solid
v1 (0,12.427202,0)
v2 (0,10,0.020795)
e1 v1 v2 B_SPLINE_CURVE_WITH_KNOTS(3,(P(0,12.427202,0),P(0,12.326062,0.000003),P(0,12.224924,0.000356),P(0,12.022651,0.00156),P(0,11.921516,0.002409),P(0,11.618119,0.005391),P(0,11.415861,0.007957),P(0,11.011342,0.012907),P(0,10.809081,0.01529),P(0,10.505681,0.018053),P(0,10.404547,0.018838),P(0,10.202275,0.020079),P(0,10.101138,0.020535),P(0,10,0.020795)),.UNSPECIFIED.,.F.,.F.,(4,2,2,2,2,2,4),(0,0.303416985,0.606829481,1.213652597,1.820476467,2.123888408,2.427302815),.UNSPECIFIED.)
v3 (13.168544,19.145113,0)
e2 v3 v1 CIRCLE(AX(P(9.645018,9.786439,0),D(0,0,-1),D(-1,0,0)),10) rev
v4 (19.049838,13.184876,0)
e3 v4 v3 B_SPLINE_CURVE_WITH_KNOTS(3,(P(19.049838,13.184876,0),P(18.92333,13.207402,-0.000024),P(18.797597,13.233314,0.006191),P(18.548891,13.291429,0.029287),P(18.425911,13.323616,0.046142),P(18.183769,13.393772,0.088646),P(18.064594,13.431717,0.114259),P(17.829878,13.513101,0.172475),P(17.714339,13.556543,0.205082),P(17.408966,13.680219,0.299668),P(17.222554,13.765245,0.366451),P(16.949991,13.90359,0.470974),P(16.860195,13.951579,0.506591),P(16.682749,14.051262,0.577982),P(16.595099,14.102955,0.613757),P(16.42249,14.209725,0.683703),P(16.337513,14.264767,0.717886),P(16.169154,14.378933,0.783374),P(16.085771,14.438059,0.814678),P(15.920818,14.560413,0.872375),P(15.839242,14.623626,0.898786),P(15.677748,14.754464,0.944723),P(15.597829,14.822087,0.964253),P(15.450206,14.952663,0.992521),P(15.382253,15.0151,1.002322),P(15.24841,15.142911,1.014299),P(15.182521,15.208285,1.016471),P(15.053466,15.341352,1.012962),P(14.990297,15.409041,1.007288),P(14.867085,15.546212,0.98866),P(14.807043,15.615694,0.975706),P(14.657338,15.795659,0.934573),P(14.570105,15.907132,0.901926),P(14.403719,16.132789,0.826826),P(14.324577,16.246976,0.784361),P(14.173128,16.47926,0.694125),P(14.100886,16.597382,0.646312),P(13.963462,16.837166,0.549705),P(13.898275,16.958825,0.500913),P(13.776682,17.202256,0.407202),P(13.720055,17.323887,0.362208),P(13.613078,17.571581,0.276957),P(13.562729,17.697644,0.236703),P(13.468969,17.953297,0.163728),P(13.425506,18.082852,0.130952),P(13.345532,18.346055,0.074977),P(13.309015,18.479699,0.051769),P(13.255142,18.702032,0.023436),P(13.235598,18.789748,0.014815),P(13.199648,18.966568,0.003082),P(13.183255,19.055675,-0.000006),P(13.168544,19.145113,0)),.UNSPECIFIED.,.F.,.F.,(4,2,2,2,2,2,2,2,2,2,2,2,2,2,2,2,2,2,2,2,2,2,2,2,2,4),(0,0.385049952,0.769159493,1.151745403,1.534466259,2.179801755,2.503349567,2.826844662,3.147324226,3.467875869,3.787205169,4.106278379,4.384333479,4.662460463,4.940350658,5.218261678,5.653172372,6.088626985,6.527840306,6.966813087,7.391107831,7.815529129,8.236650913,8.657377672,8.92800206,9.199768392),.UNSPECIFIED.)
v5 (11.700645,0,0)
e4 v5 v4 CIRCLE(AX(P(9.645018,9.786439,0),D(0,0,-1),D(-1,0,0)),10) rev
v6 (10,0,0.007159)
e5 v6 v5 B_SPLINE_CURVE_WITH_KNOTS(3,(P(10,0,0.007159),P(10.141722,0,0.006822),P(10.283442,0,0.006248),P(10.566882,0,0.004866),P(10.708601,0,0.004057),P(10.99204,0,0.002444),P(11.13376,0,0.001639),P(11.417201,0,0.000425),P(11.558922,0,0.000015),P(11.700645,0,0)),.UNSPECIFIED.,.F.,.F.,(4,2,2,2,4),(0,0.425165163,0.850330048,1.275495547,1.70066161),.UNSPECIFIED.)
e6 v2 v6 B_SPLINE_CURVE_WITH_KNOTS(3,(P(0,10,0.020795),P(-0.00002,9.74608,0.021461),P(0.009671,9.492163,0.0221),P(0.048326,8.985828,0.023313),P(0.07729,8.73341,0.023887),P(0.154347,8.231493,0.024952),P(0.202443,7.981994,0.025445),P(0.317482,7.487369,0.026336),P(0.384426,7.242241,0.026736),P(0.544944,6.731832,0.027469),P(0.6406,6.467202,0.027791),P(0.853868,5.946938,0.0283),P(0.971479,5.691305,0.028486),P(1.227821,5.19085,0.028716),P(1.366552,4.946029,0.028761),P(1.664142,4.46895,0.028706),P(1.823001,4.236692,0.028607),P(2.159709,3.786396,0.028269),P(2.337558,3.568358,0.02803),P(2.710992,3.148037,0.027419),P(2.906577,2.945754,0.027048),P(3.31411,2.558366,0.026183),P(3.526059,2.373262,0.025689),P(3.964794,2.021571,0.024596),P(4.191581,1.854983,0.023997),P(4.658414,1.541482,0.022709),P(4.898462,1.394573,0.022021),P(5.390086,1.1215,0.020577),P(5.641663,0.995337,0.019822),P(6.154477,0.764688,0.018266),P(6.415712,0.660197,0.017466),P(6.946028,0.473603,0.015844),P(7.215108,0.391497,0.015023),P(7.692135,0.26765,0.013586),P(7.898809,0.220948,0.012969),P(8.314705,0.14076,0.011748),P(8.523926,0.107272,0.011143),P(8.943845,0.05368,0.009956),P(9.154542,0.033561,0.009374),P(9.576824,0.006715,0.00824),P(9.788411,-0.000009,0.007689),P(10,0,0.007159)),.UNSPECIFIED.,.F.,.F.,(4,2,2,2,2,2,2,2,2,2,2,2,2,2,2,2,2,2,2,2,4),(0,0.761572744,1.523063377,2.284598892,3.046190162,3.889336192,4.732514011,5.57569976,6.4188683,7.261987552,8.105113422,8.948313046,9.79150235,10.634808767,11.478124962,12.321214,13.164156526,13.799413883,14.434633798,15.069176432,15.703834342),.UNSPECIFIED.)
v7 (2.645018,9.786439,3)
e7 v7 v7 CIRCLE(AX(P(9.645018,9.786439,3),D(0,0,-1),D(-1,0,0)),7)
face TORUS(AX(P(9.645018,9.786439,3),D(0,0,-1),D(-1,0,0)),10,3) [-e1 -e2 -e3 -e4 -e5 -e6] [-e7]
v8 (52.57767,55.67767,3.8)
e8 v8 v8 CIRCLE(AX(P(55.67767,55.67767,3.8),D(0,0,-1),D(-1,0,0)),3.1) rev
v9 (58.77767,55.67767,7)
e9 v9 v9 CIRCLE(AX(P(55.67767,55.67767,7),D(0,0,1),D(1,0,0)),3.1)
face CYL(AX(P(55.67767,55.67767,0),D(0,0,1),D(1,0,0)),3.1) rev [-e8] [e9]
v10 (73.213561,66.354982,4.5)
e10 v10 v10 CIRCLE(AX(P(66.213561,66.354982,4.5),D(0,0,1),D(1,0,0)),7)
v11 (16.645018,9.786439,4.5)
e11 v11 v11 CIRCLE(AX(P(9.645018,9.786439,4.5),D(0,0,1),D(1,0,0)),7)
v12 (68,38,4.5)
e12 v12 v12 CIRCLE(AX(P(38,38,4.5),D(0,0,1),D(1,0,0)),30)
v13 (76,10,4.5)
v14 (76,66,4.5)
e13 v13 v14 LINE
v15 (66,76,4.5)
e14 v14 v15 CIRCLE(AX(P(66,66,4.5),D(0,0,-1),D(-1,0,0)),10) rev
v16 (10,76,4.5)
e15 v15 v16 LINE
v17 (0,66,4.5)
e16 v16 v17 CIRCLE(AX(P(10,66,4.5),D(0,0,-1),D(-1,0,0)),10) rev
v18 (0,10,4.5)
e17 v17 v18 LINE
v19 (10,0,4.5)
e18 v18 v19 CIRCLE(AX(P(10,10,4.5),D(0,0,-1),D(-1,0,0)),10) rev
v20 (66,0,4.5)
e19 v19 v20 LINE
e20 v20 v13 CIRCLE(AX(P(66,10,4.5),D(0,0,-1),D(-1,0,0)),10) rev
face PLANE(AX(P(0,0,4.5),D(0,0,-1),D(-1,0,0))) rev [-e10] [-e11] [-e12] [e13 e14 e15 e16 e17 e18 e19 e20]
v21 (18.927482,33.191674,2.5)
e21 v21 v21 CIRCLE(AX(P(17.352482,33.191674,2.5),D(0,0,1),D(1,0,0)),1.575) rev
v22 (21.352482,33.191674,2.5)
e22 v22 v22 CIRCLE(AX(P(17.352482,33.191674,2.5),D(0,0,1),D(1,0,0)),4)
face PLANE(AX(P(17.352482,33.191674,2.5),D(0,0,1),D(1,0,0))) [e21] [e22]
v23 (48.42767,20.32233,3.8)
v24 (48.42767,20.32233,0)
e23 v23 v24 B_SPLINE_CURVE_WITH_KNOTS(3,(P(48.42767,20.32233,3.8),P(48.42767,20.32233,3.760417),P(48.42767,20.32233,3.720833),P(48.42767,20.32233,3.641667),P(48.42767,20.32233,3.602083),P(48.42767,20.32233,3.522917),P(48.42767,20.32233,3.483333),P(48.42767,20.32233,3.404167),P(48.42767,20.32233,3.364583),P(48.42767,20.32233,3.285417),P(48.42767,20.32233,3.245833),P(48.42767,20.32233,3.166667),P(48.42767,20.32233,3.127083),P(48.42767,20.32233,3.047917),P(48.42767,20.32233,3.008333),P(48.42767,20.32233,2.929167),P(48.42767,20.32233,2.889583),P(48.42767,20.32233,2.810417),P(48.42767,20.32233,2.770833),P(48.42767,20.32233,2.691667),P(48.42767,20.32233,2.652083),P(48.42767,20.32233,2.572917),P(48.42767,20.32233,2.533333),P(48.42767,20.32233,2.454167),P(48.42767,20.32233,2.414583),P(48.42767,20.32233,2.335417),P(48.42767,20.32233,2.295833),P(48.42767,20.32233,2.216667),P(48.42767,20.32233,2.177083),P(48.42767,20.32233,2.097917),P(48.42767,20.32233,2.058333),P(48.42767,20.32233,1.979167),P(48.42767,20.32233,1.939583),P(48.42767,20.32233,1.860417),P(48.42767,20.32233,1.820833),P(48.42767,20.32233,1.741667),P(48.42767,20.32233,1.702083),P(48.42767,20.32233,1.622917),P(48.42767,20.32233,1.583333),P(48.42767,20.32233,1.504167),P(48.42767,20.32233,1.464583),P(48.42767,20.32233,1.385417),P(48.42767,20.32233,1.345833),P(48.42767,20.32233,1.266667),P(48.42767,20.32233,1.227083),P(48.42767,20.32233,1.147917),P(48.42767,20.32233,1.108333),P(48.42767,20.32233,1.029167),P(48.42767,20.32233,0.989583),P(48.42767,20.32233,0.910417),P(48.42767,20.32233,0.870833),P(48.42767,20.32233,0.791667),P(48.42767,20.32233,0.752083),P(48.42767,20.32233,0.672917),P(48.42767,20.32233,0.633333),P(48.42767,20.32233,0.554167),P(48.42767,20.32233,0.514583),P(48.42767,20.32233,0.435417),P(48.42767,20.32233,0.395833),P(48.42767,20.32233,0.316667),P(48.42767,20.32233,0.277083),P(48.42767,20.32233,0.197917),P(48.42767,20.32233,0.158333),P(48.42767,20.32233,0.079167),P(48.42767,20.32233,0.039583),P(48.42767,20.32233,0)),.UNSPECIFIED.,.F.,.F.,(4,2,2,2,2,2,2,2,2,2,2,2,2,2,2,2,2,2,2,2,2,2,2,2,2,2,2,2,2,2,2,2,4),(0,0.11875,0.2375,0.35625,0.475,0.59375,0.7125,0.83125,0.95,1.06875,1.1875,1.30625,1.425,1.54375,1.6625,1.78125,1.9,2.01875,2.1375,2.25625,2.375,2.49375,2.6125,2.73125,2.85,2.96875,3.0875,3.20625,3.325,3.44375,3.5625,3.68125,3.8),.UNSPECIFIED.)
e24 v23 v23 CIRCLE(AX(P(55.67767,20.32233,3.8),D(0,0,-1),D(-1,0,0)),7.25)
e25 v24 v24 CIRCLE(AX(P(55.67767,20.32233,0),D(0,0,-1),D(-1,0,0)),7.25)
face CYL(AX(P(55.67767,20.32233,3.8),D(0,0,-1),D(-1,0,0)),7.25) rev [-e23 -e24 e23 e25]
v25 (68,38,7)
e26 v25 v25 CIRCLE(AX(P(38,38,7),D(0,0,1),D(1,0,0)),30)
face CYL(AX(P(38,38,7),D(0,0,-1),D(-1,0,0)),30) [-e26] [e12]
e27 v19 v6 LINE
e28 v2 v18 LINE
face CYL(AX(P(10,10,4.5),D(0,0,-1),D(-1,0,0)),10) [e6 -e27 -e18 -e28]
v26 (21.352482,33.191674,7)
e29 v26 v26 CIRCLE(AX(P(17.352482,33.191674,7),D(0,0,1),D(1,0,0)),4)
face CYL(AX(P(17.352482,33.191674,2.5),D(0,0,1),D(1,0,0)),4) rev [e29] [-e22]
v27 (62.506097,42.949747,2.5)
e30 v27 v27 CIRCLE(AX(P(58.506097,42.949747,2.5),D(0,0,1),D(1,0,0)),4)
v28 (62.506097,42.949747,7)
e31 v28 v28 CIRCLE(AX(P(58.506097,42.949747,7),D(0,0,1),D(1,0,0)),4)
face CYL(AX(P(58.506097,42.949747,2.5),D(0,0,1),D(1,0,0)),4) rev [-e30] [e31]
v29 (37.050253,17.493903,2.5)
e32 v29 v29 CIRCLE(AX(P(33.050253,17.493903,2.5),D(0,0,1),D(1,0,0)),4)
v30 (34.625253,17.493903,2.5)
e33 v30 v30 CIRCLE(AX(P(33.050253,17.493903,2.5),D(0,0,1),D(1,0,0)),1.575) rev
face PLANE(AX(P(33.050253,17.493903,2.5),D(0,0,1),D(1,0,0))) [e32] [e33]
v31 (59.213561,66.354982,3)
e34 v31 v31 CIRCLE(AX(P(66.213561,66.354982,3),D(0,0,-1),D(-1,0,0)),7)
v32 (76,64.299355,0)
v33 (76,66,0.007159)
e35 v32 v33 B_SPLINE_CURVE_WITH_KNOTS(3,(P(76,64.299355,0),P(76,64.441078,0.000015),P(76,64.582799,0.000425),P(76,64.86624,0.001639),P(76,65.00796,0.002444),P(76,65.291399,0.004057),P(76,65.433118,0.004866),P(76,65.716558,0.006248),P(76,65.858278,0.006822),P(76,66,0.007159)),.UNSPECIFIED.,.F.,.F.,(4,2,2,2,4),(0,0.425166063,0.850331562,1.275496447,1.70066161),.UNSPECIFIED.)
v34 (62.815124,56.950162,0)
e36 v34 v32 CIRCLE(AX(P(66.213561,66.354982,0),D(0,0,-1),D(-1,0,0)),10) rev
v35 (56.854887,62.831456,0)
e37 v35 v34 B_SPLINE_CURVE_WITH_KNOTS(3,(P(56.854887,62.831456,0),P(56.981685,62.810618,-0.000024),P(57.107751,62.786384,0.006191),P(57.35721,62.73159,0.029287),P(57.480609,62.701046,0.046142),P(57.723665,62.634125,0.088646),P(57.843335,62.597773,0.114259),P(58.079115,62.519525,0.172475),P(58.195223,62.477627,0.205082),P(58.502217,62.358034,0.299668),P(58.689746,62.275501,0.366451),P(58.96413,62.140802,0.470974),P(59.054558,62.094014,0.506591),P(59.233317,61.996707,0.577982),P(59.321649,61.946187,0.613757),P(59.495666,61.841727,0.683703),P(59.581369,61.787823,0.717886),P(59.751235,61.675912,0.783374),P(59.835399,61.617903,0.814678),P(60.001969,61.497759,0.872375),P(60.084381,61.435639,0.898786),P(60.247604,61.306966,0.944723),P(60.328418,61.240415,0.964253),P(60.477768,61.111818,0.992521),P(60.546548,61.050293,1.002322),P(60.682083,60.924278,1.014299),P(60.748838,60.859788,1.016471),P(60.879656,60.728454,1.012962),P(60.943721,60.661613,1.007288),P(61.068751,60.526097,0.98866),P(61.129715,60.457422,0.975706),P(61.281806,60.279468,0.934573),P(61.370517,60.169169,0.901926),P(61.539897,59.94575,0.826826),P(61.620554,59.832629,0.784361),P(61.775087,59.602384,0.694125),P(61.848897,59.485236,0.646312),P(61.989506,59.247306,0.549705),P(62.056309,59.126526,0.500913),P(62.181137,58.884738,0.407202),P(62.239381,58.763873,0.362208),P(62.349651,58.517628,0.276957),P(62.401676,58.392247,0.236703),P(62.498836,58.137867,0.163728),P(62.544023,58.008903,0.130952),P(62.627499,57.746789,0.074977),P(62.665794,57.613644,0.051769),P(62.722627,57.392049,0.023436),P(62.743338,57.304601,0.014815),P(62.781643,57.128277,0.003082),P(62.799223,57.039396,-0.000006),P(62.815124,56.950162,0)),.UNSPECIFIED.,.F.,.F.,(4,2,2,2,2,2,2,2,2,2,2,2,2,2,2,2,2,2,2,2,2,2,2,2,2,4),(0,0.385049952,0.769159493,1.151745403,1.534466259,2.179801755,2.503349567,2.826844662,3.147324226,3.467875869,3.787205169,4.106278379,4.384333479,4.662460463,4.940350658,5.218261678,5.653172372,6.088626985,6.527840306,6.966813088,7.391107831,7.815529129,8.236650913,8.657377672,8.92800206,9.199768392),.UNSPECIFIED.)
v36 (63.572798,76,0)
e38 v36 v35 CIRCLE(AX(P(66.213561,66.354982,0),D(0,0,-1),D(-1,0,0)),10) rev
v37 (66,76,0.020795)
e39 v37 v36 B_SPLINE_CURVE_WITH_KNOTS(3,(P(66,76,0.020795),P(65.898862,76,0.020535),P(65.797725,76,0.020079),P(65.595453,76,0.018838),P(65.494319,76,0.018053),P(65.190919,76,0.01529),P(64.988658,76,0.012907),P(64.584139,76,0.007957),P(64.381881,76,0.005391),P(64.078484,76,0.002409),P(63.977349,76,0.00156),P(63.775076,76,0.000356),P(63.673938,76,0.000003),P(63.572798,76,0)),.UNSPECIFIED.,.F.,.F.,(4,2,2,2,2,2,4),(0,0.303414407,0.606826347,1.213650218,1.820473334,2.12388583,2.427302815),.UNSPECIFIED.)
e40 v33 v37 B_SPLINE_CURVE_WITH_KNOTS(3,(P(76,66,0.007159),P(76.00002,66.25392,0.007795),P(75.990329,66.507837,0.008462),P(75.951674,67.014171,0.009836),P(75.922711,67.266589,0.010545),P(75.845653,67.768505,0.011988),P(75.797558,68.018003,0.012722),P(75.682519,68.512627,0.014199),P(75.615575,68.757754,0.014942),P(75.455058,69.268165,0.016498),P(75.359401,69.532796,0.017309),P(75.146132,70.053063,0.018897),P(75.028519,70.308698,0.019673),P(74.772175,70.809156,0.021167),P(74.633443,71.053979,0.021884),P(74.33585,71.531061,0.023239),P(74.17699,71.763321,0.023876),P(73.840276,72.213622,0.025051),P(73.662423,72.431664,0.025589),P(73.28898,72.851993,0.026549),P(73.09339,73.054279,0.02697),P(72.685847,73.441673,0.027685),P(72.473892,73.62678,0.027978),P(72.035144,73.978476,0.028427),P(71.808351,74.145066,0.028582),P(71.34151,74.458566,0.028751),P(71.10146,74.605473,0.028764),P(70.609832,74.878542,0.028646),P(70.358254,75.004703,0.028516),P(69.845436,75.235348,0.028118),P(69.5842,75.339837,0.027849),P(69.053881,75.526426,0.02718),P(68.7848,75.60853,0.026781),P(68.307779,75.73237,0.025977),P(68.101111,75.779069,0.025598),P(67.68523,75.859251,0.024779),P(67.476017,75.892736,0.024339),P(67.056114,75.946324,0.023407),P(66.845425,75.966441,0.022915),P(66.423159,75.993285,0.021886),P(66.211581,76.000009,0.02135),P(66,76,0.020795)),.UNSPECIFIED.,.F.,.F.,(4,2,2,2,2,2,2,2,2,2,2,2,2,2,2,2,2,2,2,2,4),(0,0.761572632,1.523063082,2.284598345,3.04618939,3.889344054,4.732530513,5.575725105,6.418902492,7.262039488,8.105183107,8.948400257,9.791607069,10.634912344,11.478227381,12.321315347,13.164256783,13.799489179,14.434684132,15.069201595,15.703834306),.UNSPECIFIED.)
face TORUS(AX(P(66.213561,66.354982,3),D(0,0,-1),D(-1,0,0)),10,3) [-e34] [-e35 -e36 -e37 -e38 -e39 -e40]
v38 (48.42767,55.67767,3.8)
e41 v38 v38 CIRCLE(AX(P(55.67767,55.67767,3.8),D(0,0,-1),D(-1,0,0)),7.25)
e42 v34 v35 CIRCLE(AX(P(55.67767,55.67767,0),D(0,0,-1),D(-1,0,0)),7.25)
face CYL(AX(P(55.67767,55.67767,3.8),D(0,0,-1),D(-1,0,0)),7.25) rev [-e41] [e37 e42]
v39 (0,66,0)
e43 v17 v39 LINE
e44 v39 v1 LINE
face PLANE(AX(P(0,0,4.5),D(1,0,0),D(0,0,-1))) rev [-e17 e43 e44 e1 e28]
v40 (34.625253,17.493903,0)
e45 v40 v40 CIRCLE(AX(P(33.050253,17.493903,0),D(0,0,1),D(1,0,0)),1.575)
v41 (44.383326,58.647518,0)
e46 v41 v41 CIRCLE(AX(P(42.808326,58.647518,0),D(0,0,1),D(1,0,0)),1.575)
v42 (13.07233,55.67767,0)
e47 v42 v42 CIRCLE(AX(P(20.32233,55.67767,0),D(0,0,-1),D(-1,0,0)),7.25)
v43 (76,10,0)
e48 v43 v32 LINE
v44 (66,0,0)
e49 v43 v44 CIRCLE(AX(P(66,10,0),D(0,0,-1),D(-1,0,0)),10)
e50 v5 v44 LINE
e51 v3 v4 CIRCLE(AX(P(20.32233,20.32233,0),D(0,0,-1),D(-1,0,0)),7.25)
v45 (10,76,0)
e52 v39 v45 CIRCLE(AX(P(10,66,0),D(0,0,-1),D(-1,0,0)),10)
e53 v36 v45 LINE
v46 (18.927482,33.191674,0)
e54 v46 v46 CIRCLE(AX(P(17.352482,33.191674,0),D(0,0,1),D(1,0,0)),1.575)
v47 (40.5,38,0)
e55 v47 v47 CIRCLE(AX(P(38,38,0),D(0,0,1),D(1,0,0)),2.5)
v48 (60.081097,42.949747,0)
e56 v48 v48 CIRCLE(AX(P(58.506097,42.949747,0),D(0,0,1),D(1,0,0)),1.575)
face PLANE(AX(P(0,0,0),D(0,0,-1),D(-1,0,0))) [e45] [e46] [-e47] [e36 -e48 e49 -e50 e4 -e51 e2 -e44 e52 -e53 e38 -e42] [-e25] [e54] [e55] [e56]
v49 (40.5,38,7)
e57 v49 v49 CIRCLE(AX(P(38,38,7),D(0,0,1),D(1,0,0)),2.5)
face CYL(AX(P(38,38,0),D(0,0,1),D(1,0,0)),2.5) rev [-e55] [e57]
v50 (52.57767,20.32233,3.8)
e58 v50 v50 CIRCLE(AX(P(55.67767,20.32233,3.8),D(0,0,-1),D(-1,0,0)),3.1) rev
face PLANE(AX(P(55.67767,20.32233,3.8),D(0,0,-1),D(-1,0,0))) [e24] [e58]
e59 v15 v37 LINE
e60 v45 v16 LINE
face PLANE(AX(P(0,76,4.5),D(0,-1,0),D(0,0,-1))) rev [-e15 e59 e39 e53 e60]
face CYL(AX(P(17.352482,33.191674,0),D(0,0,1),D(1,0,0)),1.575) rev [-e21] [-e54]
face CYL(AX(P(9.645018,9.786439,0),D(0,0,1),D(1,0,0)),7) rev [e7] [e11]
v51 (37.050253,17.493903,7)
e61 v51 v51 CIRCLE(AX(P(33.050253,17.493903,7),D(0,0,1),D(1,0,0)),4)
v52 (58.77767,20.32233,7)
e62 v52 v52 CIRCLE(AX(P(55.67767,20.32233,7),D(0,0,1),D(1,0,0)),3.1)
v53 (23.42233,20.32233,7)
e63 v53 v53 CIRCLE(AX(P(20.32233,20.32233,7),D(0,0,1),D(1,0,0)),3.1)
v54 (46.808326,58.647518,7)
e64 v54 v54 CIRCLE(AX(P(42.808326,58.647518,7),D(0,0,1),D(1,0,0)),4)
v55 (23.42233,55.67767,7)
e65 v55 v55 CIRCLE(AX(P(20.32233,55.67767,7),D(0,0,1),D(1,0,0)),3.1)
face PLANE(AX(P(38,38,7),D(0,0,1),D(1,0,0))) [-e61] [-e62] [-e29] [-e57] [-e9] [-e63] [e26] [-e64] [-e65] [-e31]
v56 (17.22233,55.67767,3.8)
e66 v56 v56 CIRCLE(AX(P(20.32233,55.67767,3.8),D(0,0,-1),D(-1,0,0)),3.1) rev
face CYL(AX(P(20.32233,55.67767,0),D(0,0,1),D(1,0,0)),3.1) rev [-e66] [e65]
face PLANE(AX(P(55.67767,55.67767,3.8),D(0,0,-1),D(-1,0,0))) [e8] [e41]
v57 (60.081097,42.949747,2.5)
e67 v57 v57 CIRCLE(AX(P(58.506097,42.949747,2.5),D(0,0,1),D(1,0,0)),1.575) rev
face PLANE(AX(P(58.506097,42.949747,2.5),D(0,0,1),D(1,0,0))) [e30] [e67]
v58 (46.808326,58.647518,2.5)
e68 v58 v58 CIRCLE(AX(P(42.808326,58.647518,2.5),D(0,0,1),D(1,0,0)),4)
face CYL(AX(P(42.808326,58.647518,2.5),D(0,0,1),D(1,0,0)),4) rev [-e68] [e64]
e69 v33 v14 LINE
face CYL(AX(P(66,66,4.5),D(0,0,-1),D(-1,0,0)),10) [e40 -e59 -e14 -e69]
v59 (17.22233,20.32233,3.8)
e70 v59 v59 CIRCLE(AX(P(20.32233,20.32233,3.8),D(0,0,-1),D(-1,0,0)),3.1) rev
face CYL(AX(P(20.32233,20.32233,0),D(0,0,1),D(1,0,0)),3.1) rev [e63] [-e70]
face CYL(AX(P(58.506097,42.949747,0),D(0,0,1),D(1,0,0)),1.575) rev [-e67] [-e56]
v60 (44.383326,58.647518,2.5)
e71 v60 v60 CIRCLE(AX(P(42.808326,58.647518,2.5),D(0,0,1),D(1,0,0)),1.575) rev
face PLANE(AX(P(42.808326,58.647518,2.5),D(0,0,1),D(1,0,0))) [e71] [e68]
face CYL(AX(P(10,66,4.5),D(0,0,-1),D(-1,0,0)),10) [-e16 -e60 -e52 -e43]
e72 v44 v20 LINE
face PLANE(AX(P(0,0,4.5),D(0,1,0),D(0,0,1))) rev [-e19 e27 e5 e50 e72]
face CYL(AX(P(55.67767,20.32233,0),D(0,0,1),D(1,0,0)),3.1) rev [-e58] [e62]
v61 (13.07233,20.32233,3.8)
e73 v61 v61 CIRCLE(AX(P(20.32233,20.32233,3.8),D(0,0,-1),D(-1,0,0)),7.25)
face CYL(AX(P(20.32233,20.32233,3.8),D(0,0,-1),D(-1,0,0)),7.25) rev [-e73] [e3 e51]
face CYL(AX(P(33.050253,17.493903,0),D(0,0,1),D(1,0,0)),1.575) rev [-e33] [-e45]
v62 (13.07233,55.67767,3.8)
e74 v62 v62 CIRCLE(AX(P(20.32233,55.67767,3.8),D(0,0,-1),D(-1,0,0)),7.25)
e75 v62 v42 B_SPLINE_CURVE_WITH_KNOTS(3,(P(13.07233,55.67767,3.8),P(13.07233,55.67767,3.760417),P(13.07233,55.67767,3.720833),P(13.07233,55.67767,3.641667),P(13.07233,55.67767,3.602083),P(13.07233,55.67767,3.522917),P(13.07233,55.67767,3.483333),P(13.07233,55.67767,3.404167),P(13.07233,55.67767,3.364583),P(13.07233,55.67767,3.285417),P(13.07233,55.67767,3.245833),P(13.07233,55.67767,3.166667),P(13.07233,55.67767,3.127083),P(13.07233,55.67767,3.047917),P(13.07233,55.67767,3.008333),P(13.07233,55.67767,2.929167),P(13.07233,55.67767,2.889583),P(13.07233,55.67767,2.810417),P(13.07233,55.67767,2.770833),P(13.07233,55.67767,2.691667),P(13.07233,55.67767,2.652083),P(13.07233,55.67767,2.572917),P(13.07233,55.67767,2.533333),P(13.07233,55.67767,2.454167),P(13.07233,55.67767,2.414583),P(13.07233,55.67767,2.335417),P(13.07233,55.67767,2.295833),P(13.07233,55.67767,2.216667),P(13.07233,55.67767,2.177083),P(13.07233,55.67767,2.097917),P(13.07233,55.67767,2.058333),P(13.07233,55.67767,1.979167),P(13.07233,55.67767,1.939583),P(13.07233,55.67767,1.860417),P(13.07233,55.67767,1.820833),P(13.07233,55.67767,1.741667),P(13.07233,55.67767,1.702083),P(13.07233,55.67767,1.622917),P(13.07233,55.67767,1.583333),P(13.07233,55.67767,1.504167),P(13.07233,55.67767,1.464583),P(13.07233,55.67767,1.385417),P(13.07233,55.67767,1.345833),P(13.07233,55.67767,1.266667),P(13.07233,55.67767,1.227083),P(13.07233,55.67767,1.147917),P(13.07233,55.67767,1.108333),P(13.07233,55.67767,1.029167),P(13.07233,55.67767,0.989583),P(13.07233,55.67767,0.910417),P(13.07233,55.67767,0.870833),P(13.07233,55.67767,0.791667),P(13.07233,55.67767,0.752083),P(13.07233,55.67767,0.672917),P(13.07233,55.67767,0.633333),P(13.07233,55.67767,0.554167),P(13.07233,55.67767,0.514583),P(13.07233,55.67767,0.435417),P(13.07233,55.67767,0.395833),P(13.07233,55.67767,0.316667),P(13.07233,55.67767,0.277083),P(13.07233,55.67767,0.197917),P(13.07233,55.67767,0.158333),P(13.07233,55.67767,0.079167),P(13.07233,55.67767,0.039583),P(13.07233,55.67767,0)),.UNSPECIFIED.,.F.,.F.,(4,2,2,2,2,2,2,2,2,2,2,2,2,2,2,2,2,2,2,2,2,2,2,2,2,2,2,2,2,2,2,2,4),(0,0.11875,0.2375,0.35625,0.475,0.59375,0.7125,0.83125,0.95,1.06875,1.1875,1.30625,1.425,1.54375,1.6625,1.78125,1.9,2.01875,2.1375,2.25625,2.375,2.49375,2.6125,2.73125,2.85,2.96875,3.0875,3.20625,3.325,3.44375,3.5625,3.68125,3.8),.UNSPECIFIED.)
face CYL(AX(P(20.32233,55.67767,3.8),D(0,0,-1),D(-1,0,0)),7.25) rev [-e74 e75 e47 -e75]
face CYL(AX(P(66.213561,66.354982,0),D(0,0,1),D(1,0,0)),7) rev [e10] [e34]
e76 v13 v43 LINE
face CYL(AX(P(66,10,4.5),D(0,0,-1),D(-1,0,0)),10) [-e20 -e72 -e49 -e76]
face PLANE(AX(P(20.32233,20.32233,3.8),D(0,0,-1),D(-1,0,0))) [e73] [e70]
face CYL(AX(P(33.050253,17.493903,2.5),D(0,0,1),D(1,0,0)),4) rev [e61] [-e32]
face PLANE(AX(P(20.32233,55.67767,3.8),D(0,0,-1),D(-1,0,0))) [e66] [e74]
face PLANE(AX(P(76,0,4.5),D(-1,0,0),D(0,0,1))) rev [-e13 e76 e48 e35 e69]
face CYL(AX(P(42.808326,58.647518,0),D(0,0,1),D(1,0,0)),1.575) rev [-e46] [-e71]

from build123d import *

# Parameters (mm, degrees)
SKETCH1_W           = 76
SKETCH1_H           = 76
BOSS_EXTRUDE1_DEPTH = 4.5
SKETCH2_R           = 3.1
SKETCH2_R_2         = 2.5
SKETCH2_R_3         = 7
SKETCH2_R_4         = 1.575
CUT_EXTRUDE1_DEPTH  = 108.574392864
FILLET1_R           = 10
SKETCH3_R           = 7.25
CUT_EXTRUDE2_DEPTH  = 3.8
SKETCH4_R           = 4
CUT_EXTRUDE3_DEPTH  = 2
FILLET2_R           = 3
BOSS_EXTRUDE2_START = 2.5
SKETCH6_R           = 30
SKETCH6_R_2         = 2.5
SKETCH6_R_3         = 3.1
SKETCH6_R_4         = 4
BOSS_EXTRUDE2_DEPTH = 2.5


with BuildPart() as part:
    # Sketch1 → Boss-Extrude1 (new body)
    with BuildSketch(Plane.XY):
        with Locations((38, 38)):
            Rectangle(SKETCH1_W, SKETCH1_H)
    extrude(amount=BOSS_EXTRUDE1_DEPTH)

    # Sketch2 → Cut-Extrude1 (cut, through all)
    with BuildSketch(Plane.XY.offset(4.5)):
        with Locations((55.67766953, 55.67766953)):
            Circle(SKETCH2_R)
        with Locations((20.32233047, 55.67766953)):
            Circle(SKETCH2_R)
        with Locations((20.32233047, 20.32233047)):
            Circle(SKETCH2_R)
        with Locations((55.67766953, 20.32233047)):
            Circle(SKETCH2_R)
        with Locations((38, 38)):
            Circle(SKETCH2_R_2)
        with Locations((66.213560569, 66.354981926)):
            Circle(SKETCH2_R_3)
        with Locations((42.808326112, 58.647518011)):
            Circle(SKETCH2_R_4)
        with Locations((58.506096654, 42.949747468)):
            Circle(SKETCH2_R_4)
        with Locations((17.352481989, 33.191673888)):
            Circle(SKETCH2_R_4)
        with Locations((9.645018074, 9.786439431)):
            Circle(SKETCH2_R_3)
        with Locations((33.050252532, 17.493903346)):
            Circle(SKETCH2_R_4)
    extrude(amount=-CUT_EXTRUDE1_DEPTH, mode=Mode.SUBTRACT)

    # Fillet1
    fillet1_edges = [part.edges().sort_by_distance(p)[0] for p in [
        (0, 76, 2.25),
        (76, 76, 2.25),
        (76, 0, 2.25),
        (0, 0, 2.25),
    ]]
    fillet(fillet1_edges, radius=FILLET1_R)

    # Sketch3 → Cut-Extrude2 (cut)
    with BuildSketch(Plane(origin=(0, 0, 0), x_dir=(-1, 0, 0), z_dir=(0, 0, -1))):
        with Locations((-55.67766953, 55.67766953)):
            Circle(SKETCH3_R)
        with Locations((-20.32233047, 55.67766953)):
            Circle(SKETCH3_R)
        with Locations((-55.67766953, 20.32233047)):
            Circle(SKETCH3_R)
        with Locations((-20.32233047, 20.32233047)):
            Circle(SKETCH3_R)
    extrude(amount=-CUT_EXTRUDE2_DEPTH, mode=Mode.SUBTRACT)

    # Sketch4 → Cut-Extrude3 (cut)
    with BuildSketch(Plane.XY.offset(4.5)):
        with Locations((58.506096654, 42.949747468)):
            Circle(SKETCH4_R)
        with Locations((33.050252532, 17.493903346)):
            Circle(SKETCH4_R)
        with Locations((17.352481989, 33.191673888)):
            Circle(SKETCH4_R)
        with Locations((42.808326112, 58.647518011)):
            Circle(SKETCH4_R)
    extrude(amount=-CUT_EXTRUDE3_DEPTH, mode=Mode.SUBTRACT)

    # Fillet2
    # the kernel refuses this fillet: 3 mm, written as the material it takes off along each edge
    with BuildSketch(Plane(origin=(66.213560569, 66.354981926, 0), x_dir=(1, 0, 0), z_dir=(0, -1, 0))) as fillet2_piece_1:
        with BuildLine():
            CenterArc((7 + FILLET2_R, FILLET2_R), FILLET2_R, 180, 90)
            Line((7, FILLET2_R), (7, 0))
            Line((7, 0), (7 + FILLET2_R, 0))
        make_face()
    revolve(axis=Axis((66.213560569, 66.354981926, 0), (0, 0, 1)), mode=Mode.SUBTRACT)
    with BuildSketch(Plane(origin=(9.645018074, 9.786439431, 0), x_dir=(1, 0, 0), z_dir=(0, -1, 0))) as fillet2_piece_2:
        with BuildLine():
            CenterArc((7 + FILLET2_R, FILLET2_R), FILLET2_R, 180, 90)
            Line((7, FILLET2_R), (7, 0))
            Line((7, 0), (7 + FILLET2_R, 0))
        make_face()
    revolve(axis=Axis((9.645018074, 9.786439431, 0), (0, 0, 1)), mode=Mode.SUBTRACT)

    # Sketch6 → Boss-Extrude2 (add)
    with BuildSketch(Plane.XY.offset(4.5).offset(BOSS_EXTRUDE2_START)):
        with Locations((38, 38)):
            Circle(SKETCH6_R)
        with Locations((38, 38)):
            Circle(SKETCH6_R_2, mode=Mode.SUBTRACT)
        with Locations((55.67766953, 55.67766953)):
            Circle(SKETCH6_R_3, mode=Mode.SUBTRACT)
        with Locations((55.67766953, 20.32233047)):
            Circle(SKETCH6_R_3, mode=Mode.SUBTRACT)
        with Locations((20.32233047, 55.67766953)):
            Circle(SKETCH6_R_3, mode=Mode.SUBTRACT)
        with Locations((58.506096654, 42.949747468)):
            Circle(SKETCH6_R_4, mode=Mode.SUBTRACT)
        with Locations((42.808326112, 58.647518011)):
            Circle(SKETCH6_R_4, mode=Mode.SUBTRACT)
        with Locations((33.050252532, 17.493903346)):
            Circle(SKETCH6_R_4, mode=Mode.SUBTRACT)
        with Locations((17.352481989, 33.191673888)):
            Circle(SKETCH6_R_4, mode=Mode.SUBTRACT)
        with Locations((20.32233047, 20.32233047)):
            Circle(SKETCH6_R_3, mode=Mode.SUBTRACT)
    extrude(amount=-BOSS_EXTRUDE2_DEPTH)


solid = part.part
